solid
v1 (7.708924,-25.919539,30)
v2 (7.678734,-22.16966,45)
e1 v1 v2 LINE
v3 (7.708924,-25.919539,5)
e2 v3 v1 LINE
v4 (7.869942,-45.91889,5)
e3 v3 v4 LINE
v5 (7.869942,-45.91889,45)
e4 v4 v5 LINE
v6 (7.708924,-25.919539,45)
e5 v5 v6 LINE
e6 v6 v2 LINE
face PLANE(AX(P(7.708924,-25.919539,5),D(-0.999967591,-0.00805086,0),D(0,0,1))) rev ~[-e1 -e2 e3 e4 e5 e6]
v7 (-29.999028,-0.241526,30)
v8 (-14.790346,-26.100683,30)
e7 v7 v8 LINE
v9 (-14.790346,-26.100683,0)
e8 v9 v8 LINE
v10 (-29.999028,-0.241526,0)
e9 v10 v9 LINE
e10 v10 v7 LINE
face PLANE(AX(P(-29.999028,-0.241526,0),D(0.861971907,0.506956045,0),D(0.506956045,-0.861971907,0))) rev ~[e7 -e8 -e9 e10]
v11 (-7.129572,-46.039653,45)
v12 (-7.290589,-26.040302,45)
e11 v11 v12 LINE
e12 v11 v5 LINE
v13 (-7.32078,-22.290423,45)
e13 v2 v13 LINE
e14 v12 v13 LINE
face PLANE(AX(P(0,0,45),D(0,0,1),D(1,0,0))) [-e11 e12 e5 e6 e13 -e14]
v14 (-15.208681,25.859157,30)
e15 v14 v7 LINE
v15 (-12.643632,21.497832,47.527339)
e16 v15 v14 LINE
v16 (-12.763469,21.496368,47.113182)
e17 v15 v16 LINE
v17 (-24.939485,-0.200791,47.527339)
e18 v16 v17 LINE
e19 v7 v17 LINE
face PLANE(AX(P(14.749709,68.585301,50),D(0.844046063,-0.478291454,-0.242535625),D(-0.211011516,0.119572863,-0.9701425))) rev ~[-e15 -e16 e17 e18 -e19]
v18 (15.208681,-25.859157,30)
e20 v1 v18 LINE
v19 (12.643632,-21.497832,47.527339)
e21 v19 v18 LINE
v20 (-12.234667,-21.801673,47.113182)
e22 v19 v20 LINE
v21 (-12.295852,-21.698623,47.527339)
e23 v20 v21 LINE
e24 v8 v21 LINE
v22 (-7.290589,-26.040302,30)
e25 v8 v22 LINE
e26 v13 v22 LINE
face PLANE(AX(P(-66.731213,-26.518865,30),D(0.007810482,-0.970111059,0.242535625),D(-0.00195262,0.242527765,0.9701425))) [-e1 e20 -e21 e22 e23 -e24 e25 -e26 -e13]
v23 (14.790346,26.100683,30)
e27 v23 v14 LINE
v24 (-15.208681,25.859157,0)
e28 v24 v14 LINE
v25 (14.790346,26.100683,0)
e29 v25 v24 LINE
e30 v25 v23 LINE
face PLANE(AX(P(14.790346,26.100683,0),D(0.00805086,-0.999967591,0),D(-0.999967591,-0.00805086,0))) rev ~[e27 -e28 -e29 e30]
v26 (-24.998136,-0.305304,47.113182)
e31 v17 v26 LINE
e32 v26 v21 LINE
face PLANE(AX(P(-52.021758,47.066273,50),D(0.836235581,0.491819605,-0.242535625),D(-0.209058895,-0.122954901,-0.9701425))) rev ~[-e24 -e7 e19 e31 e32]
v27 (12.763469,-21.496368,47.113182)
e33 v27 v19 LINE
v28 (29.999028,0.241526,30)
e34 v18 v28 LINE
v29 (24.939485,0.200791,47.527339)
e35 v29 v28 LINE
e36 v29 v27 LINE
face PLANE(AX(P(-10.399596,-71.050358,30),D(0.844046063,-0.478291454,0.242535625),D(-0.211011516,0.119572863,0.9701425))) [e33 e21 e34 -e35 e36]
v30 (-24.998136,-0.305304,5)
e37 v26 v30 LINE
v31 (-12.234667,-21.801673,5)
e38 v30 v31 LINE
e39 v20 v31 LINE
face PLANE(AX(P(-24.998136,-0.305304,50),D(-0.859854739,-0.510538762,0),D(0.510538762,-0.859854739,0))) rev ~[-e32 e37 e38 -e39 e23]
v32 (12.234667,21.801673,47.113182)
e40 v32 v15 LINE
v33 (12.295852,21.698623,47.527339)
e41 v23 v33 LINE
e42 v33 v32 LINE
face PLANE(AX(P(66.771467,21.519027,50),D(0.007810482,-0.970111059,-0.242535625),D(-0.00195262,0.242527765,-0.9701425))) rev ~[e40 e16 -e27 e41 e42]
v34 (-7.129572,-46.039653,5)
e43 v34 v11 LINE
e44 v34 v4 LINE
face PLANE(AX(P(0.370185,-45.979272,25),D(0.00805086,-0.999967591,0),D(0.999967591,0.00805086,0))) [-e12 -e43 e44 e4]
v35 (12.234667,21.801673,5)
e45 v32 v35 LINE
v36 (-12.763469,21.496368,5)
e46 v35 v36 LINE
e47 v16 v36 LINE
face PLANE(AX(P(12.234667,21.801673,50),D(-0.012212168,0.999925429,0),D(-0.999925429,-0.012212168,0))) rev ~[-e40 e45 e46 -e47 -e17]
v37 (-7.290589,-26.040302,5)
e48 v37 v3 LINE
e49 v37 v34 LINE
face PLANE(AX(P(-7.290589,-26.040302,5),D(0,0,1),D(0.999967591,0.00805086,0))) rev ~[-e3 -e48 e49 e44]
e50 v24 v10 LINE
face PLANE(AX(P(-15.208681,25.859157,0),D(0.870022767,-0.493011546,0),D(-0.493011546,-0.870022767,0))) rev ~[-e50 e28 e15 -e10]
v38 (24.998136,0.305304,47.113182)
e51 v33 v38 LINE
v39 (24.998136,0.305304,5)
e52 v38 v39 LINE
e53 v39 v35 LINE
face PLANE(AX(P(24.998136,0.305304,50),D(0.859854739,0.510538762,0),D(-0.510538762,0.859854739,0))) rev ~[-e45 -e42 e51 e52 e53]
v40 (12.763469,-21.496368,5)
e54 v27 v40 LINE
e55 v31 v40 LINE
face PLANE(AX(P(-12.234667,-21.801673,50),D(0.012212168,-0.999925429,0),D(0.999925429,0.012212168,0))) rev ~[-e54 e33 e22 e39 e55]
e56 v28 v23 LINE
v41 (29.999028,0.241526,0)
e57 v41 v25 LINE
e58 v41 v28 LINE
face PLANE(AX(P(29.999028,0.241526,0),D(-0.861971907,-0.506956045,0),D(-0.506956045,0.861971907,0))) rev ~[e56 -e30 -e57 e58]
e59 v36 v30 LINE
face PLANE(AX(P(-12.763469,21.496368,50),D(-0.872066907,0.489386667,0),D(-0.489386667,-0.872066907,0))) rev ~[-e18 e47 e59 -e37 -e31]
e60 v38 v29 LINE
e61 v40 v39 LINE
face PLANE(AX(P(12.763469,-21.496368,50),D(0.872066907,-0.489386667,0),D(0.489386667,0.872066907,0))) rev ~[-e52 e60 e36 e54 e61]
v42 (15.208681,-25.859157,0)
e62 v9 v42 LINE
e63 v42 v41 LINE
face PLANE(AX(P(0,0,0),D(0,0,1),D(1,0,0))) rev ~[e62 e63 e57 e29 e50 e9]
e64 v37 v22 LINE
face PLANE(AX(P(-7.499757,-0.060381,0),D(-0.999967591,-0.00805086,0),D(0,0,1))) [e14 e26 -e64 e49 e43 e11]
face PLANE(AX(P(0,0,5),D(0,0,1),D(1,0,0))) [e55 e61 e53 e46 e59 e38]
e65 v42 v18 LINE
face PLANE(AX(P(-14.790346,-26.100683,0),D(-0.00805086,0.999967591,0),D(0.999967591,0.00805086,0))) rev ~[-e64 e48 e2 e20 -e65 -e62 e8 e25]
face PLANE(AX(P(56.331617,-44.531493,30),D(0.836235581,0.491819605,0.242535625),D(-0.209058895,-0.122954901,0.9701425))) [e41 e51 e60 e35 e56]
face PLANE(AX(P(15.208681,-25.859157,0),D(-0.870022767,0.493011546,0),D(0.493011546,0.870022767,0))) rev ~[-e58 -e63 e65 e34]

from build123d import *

# Parameters (mm, degrees)
F1_DEPTH     = 50
F3_DEPTH     = 45
F4_W         = 15
F4_H         = 40
F5_DEPTH     = 20
F6_T1_DEPTH  = 133.8850999909
F6_T3_DEPTH  = 133.8850999909
F6_T5_DEPTH  = 133.8850999909
F6_T10_DEPTH = 133.8850999909
F6_T15_DEPTH = 133.8850999909
F6_T20_DEPTH = 133.8850999909
F6_T25_DEPTH = 133.8850999909
F6_T30_DEPTH = 133.8850999909


# Not quite as in the source:
# - a fillet or chamfer that OpenCascade refuses, or shapes differently, is made with other operations: its cross-section is extruded or revolved along the edge and cut away or added


with BuildPart() as f1:
    # F0 (on Top) → F1 (new body)
    with BuildSketch(Plane.XY):
        Polygon((29.9990277389, 0.2415258118), (14.7903463808, 26.1006830166), (-15.2086813581, 25.8591572049), (-29.9990277389, -0.2415258118), (-14.7903463808, -26.1006830166), (15.2086813581, -25.8591572049), align=None)
    extrude(amount=F1_DEPTH)

    # F2 (on face) → F3 (cut)
    with BuildSketch(Plane.XY.offset(50)):
        Polygon((24.9981357174, 0.3053041981), (12.2346666673, 21.8016726776), (-12.7634690502, 21.4963684795), (-24.9981357174, -0.3053041981), (-12.2346666673, -21.8016726776), (12.7634690502, -21.4963684795), align=None)
    extrude(amount=-F3_DEPTH, mode=Mode.SUBTRACT)

    # F4 (on face) → F5 (join)
    with BuildSketch(Plane(origin=(0.2091674886, -25.9799201108, 0), x_dir=(0.9999675913, 0.0080508604, 0), z_dir=(0.0080508604, -0.9999675913, 0))):
        with Locations((0, 25)):
            Rectangle(F4_W, F4_H)
    extrude(amount=F5_DEPTH)

    # F6: chamfer of 20 x 5 on 6 edges, made by hand

    # F6_s2 → F6_t1 (cut)
    with BuildSketch(Plane(origin=(33.0034500683, 58.2415425919, 0), x_dir=(0, 0, 1), z_dir=(-0.493011546, -0.8700227672, 0))):
        Polygon((50, 20.9807621135), (30, 25.9807621135), (50, 25.9807621135), align=None)
    extrude(amount=F6_T1_DEPTH, mode=Mode.SUBTRACT)

    # F6_s4 → F6_t3 (cut)
    with BuildSketch(Plane(origin=(66.9403804743, 0.5389451243, 0), x_dir=(0, 0, 1), z_dir=(-0.9999675913, -0.0080508604, 0))):
        Polygon((50, 20.9807621135), (30, 25.9807621135), (50, 25.9807621135), align=None)
    extrude(amount=F6_T3_DEPTH, mode=Mode.SUBTRACT)

    # F6_s6 → F6_t5 (cut)
    with BuildSketch(Plane(origin=(33.936930406, -57.7025974676, 0), x_dir=(0, 0, 1), z_dir=(-0.5069560453, 0.8619719068, 0))):
        Polygon((30, 25.9807621135), (50, 20.9807621135), (50, 25.9807621135), align=None)
    extrude(amount=F6_T5_DEPTH, mode=Mode.SUBTRACT)


with BuildPart() as f6_tool8:
    # F6_s9 → F6_t10 (new body)
    with BuildSketch(Plane(origin=(-33.0034500683, -58.2415425919, 0), x_dir=(0, 0, 1), z_dir=(0.493011546, 0.8700227672, 0))):
        Polygon((30, 25.9807621135), (50, 20.9807621135), (50, 25.9807621135), align=None)
    extrude(amount=F6_T10_DEPTH)

    split(bisect_by=Plane(origin=(7.4997569347, 0.0603814529, 0), x_dir=(0, 0, 1), z_dir=(0.9999675913, 0.0080508604, 0)), keep=Keep.TOP)


with BuildPart() as f1_1:
    add(f1.part)

    # F6_t7: cut F6_tool8
    add(f6_tool8.part, mode=Mode.SUBTRACT)


with BuildPart() as f6_tool13:
    # F6_s14 → F6_t15 (new body)
    with BuildSketch(Plane(origin=(-66.9403804743, -0.5389451243, 0), x_dir=(0, 0, 1), z_dir=(0.9999675913, 0.0080508604, 0))):
        Polygon((30, 25.9807621135), (50, 20.9807621135), (50, 25.9807621135), align=None)
    extrude(amount=F6_T15_DEPTH)

    split(bisect_by=Plane(origin=(-7.4997569347, -0.0603814529, 0), x_dir=(0, 0, 1), z_dir=(-0.9999675913, -0.0080508604, 0)), keep=Keep.TOP)


with BuildPart() as f1_2:
    add(f1_1.part)

    # F6_t12: cut F6_tool13
    add(f6_tool13.part, mode=Mode.SUBTRACT)


with BuildPart() as f6_tool18:
    # F6_s19 → F6_t20 (new body)
    with BuildSketch(Plane(origin=(-66.9403804743, -0.5389451243, 0), x_dir=(0, 0, 1), z_dir=(0.9999675913, 0.0080508604, 0))):
        Polygon((30, 25.9807621135), (50, 20.9807621135), (50, 25.9807621135), align=None)
    extrude(amount=F6_T20_DEPTH)

    split(bisect_by=Plane.XY.offset(45), keep=Keep.TOP)


with BuildPart() as f1_3:
    add(f1_2.part)

    # F6_t17: cut F6_tool18
    add(f6_tool18.part, mode=Mode.SUBTRACT)


with BuildPart() as f6_tool23:
    # F6_s24 → F6_t25 (new body)
    with BuildSketch(Plane(origin=(-66.9403804743, -0.5389451243, 0), x_dir=(0, 0, 1), z_dir=(0.9999675913, 0.0080508604, 0))):
        Polygon((30, 25.9807621135), (50, 20.9807621135), (50, 25.9807621135), align=None)
    extrude(amount=F6_T25_DEPTH)

    split(bisect_by=Plane(origin=(7.4997569347, 0.0603814529, 0), x_dir=(0, 0, 1), z_dir=(0.9999675913, 0.0080508604, 0)), keep=Keep.TOP)


with BuildPart() as f1_4:
    add(f1_3.part)

    # F6_t22: cut F6_tool23
    add(f6_tool23.part, mode=Mode.SUBTRACT)


with BuildPart() as f6_tool28:
    # F6_s29 → F6_t30 (new body)
    with BuildSketch(Plane(origin=(-33.936930406, 57.7025974676, 0), x_dir=(0, 0, 1), z_dir=(0.5069560453, -0.8619719068, 0))):
        Polygon((50, 20.9807621135), (30, 25.9807621135), (50, 25.9807621135), align=None)
    extrude(amount=F6_T30_DEPTH)

    split(bisect_by=Plane(origin=(-7.4997569347, -0.0603814529, 0), x_dir=(0, 0, 1), z_dir=(-0.9999675913, -0.0080508604, 0)), keep=Keep.TOP)


with BuildPart() as f1_5:
    add(f1_4.part)

    # F6_t27: cut F6_tool28
    add(f6_tool28.part, mode=Mode.SUBTRACT)


solid = f1_5.part
